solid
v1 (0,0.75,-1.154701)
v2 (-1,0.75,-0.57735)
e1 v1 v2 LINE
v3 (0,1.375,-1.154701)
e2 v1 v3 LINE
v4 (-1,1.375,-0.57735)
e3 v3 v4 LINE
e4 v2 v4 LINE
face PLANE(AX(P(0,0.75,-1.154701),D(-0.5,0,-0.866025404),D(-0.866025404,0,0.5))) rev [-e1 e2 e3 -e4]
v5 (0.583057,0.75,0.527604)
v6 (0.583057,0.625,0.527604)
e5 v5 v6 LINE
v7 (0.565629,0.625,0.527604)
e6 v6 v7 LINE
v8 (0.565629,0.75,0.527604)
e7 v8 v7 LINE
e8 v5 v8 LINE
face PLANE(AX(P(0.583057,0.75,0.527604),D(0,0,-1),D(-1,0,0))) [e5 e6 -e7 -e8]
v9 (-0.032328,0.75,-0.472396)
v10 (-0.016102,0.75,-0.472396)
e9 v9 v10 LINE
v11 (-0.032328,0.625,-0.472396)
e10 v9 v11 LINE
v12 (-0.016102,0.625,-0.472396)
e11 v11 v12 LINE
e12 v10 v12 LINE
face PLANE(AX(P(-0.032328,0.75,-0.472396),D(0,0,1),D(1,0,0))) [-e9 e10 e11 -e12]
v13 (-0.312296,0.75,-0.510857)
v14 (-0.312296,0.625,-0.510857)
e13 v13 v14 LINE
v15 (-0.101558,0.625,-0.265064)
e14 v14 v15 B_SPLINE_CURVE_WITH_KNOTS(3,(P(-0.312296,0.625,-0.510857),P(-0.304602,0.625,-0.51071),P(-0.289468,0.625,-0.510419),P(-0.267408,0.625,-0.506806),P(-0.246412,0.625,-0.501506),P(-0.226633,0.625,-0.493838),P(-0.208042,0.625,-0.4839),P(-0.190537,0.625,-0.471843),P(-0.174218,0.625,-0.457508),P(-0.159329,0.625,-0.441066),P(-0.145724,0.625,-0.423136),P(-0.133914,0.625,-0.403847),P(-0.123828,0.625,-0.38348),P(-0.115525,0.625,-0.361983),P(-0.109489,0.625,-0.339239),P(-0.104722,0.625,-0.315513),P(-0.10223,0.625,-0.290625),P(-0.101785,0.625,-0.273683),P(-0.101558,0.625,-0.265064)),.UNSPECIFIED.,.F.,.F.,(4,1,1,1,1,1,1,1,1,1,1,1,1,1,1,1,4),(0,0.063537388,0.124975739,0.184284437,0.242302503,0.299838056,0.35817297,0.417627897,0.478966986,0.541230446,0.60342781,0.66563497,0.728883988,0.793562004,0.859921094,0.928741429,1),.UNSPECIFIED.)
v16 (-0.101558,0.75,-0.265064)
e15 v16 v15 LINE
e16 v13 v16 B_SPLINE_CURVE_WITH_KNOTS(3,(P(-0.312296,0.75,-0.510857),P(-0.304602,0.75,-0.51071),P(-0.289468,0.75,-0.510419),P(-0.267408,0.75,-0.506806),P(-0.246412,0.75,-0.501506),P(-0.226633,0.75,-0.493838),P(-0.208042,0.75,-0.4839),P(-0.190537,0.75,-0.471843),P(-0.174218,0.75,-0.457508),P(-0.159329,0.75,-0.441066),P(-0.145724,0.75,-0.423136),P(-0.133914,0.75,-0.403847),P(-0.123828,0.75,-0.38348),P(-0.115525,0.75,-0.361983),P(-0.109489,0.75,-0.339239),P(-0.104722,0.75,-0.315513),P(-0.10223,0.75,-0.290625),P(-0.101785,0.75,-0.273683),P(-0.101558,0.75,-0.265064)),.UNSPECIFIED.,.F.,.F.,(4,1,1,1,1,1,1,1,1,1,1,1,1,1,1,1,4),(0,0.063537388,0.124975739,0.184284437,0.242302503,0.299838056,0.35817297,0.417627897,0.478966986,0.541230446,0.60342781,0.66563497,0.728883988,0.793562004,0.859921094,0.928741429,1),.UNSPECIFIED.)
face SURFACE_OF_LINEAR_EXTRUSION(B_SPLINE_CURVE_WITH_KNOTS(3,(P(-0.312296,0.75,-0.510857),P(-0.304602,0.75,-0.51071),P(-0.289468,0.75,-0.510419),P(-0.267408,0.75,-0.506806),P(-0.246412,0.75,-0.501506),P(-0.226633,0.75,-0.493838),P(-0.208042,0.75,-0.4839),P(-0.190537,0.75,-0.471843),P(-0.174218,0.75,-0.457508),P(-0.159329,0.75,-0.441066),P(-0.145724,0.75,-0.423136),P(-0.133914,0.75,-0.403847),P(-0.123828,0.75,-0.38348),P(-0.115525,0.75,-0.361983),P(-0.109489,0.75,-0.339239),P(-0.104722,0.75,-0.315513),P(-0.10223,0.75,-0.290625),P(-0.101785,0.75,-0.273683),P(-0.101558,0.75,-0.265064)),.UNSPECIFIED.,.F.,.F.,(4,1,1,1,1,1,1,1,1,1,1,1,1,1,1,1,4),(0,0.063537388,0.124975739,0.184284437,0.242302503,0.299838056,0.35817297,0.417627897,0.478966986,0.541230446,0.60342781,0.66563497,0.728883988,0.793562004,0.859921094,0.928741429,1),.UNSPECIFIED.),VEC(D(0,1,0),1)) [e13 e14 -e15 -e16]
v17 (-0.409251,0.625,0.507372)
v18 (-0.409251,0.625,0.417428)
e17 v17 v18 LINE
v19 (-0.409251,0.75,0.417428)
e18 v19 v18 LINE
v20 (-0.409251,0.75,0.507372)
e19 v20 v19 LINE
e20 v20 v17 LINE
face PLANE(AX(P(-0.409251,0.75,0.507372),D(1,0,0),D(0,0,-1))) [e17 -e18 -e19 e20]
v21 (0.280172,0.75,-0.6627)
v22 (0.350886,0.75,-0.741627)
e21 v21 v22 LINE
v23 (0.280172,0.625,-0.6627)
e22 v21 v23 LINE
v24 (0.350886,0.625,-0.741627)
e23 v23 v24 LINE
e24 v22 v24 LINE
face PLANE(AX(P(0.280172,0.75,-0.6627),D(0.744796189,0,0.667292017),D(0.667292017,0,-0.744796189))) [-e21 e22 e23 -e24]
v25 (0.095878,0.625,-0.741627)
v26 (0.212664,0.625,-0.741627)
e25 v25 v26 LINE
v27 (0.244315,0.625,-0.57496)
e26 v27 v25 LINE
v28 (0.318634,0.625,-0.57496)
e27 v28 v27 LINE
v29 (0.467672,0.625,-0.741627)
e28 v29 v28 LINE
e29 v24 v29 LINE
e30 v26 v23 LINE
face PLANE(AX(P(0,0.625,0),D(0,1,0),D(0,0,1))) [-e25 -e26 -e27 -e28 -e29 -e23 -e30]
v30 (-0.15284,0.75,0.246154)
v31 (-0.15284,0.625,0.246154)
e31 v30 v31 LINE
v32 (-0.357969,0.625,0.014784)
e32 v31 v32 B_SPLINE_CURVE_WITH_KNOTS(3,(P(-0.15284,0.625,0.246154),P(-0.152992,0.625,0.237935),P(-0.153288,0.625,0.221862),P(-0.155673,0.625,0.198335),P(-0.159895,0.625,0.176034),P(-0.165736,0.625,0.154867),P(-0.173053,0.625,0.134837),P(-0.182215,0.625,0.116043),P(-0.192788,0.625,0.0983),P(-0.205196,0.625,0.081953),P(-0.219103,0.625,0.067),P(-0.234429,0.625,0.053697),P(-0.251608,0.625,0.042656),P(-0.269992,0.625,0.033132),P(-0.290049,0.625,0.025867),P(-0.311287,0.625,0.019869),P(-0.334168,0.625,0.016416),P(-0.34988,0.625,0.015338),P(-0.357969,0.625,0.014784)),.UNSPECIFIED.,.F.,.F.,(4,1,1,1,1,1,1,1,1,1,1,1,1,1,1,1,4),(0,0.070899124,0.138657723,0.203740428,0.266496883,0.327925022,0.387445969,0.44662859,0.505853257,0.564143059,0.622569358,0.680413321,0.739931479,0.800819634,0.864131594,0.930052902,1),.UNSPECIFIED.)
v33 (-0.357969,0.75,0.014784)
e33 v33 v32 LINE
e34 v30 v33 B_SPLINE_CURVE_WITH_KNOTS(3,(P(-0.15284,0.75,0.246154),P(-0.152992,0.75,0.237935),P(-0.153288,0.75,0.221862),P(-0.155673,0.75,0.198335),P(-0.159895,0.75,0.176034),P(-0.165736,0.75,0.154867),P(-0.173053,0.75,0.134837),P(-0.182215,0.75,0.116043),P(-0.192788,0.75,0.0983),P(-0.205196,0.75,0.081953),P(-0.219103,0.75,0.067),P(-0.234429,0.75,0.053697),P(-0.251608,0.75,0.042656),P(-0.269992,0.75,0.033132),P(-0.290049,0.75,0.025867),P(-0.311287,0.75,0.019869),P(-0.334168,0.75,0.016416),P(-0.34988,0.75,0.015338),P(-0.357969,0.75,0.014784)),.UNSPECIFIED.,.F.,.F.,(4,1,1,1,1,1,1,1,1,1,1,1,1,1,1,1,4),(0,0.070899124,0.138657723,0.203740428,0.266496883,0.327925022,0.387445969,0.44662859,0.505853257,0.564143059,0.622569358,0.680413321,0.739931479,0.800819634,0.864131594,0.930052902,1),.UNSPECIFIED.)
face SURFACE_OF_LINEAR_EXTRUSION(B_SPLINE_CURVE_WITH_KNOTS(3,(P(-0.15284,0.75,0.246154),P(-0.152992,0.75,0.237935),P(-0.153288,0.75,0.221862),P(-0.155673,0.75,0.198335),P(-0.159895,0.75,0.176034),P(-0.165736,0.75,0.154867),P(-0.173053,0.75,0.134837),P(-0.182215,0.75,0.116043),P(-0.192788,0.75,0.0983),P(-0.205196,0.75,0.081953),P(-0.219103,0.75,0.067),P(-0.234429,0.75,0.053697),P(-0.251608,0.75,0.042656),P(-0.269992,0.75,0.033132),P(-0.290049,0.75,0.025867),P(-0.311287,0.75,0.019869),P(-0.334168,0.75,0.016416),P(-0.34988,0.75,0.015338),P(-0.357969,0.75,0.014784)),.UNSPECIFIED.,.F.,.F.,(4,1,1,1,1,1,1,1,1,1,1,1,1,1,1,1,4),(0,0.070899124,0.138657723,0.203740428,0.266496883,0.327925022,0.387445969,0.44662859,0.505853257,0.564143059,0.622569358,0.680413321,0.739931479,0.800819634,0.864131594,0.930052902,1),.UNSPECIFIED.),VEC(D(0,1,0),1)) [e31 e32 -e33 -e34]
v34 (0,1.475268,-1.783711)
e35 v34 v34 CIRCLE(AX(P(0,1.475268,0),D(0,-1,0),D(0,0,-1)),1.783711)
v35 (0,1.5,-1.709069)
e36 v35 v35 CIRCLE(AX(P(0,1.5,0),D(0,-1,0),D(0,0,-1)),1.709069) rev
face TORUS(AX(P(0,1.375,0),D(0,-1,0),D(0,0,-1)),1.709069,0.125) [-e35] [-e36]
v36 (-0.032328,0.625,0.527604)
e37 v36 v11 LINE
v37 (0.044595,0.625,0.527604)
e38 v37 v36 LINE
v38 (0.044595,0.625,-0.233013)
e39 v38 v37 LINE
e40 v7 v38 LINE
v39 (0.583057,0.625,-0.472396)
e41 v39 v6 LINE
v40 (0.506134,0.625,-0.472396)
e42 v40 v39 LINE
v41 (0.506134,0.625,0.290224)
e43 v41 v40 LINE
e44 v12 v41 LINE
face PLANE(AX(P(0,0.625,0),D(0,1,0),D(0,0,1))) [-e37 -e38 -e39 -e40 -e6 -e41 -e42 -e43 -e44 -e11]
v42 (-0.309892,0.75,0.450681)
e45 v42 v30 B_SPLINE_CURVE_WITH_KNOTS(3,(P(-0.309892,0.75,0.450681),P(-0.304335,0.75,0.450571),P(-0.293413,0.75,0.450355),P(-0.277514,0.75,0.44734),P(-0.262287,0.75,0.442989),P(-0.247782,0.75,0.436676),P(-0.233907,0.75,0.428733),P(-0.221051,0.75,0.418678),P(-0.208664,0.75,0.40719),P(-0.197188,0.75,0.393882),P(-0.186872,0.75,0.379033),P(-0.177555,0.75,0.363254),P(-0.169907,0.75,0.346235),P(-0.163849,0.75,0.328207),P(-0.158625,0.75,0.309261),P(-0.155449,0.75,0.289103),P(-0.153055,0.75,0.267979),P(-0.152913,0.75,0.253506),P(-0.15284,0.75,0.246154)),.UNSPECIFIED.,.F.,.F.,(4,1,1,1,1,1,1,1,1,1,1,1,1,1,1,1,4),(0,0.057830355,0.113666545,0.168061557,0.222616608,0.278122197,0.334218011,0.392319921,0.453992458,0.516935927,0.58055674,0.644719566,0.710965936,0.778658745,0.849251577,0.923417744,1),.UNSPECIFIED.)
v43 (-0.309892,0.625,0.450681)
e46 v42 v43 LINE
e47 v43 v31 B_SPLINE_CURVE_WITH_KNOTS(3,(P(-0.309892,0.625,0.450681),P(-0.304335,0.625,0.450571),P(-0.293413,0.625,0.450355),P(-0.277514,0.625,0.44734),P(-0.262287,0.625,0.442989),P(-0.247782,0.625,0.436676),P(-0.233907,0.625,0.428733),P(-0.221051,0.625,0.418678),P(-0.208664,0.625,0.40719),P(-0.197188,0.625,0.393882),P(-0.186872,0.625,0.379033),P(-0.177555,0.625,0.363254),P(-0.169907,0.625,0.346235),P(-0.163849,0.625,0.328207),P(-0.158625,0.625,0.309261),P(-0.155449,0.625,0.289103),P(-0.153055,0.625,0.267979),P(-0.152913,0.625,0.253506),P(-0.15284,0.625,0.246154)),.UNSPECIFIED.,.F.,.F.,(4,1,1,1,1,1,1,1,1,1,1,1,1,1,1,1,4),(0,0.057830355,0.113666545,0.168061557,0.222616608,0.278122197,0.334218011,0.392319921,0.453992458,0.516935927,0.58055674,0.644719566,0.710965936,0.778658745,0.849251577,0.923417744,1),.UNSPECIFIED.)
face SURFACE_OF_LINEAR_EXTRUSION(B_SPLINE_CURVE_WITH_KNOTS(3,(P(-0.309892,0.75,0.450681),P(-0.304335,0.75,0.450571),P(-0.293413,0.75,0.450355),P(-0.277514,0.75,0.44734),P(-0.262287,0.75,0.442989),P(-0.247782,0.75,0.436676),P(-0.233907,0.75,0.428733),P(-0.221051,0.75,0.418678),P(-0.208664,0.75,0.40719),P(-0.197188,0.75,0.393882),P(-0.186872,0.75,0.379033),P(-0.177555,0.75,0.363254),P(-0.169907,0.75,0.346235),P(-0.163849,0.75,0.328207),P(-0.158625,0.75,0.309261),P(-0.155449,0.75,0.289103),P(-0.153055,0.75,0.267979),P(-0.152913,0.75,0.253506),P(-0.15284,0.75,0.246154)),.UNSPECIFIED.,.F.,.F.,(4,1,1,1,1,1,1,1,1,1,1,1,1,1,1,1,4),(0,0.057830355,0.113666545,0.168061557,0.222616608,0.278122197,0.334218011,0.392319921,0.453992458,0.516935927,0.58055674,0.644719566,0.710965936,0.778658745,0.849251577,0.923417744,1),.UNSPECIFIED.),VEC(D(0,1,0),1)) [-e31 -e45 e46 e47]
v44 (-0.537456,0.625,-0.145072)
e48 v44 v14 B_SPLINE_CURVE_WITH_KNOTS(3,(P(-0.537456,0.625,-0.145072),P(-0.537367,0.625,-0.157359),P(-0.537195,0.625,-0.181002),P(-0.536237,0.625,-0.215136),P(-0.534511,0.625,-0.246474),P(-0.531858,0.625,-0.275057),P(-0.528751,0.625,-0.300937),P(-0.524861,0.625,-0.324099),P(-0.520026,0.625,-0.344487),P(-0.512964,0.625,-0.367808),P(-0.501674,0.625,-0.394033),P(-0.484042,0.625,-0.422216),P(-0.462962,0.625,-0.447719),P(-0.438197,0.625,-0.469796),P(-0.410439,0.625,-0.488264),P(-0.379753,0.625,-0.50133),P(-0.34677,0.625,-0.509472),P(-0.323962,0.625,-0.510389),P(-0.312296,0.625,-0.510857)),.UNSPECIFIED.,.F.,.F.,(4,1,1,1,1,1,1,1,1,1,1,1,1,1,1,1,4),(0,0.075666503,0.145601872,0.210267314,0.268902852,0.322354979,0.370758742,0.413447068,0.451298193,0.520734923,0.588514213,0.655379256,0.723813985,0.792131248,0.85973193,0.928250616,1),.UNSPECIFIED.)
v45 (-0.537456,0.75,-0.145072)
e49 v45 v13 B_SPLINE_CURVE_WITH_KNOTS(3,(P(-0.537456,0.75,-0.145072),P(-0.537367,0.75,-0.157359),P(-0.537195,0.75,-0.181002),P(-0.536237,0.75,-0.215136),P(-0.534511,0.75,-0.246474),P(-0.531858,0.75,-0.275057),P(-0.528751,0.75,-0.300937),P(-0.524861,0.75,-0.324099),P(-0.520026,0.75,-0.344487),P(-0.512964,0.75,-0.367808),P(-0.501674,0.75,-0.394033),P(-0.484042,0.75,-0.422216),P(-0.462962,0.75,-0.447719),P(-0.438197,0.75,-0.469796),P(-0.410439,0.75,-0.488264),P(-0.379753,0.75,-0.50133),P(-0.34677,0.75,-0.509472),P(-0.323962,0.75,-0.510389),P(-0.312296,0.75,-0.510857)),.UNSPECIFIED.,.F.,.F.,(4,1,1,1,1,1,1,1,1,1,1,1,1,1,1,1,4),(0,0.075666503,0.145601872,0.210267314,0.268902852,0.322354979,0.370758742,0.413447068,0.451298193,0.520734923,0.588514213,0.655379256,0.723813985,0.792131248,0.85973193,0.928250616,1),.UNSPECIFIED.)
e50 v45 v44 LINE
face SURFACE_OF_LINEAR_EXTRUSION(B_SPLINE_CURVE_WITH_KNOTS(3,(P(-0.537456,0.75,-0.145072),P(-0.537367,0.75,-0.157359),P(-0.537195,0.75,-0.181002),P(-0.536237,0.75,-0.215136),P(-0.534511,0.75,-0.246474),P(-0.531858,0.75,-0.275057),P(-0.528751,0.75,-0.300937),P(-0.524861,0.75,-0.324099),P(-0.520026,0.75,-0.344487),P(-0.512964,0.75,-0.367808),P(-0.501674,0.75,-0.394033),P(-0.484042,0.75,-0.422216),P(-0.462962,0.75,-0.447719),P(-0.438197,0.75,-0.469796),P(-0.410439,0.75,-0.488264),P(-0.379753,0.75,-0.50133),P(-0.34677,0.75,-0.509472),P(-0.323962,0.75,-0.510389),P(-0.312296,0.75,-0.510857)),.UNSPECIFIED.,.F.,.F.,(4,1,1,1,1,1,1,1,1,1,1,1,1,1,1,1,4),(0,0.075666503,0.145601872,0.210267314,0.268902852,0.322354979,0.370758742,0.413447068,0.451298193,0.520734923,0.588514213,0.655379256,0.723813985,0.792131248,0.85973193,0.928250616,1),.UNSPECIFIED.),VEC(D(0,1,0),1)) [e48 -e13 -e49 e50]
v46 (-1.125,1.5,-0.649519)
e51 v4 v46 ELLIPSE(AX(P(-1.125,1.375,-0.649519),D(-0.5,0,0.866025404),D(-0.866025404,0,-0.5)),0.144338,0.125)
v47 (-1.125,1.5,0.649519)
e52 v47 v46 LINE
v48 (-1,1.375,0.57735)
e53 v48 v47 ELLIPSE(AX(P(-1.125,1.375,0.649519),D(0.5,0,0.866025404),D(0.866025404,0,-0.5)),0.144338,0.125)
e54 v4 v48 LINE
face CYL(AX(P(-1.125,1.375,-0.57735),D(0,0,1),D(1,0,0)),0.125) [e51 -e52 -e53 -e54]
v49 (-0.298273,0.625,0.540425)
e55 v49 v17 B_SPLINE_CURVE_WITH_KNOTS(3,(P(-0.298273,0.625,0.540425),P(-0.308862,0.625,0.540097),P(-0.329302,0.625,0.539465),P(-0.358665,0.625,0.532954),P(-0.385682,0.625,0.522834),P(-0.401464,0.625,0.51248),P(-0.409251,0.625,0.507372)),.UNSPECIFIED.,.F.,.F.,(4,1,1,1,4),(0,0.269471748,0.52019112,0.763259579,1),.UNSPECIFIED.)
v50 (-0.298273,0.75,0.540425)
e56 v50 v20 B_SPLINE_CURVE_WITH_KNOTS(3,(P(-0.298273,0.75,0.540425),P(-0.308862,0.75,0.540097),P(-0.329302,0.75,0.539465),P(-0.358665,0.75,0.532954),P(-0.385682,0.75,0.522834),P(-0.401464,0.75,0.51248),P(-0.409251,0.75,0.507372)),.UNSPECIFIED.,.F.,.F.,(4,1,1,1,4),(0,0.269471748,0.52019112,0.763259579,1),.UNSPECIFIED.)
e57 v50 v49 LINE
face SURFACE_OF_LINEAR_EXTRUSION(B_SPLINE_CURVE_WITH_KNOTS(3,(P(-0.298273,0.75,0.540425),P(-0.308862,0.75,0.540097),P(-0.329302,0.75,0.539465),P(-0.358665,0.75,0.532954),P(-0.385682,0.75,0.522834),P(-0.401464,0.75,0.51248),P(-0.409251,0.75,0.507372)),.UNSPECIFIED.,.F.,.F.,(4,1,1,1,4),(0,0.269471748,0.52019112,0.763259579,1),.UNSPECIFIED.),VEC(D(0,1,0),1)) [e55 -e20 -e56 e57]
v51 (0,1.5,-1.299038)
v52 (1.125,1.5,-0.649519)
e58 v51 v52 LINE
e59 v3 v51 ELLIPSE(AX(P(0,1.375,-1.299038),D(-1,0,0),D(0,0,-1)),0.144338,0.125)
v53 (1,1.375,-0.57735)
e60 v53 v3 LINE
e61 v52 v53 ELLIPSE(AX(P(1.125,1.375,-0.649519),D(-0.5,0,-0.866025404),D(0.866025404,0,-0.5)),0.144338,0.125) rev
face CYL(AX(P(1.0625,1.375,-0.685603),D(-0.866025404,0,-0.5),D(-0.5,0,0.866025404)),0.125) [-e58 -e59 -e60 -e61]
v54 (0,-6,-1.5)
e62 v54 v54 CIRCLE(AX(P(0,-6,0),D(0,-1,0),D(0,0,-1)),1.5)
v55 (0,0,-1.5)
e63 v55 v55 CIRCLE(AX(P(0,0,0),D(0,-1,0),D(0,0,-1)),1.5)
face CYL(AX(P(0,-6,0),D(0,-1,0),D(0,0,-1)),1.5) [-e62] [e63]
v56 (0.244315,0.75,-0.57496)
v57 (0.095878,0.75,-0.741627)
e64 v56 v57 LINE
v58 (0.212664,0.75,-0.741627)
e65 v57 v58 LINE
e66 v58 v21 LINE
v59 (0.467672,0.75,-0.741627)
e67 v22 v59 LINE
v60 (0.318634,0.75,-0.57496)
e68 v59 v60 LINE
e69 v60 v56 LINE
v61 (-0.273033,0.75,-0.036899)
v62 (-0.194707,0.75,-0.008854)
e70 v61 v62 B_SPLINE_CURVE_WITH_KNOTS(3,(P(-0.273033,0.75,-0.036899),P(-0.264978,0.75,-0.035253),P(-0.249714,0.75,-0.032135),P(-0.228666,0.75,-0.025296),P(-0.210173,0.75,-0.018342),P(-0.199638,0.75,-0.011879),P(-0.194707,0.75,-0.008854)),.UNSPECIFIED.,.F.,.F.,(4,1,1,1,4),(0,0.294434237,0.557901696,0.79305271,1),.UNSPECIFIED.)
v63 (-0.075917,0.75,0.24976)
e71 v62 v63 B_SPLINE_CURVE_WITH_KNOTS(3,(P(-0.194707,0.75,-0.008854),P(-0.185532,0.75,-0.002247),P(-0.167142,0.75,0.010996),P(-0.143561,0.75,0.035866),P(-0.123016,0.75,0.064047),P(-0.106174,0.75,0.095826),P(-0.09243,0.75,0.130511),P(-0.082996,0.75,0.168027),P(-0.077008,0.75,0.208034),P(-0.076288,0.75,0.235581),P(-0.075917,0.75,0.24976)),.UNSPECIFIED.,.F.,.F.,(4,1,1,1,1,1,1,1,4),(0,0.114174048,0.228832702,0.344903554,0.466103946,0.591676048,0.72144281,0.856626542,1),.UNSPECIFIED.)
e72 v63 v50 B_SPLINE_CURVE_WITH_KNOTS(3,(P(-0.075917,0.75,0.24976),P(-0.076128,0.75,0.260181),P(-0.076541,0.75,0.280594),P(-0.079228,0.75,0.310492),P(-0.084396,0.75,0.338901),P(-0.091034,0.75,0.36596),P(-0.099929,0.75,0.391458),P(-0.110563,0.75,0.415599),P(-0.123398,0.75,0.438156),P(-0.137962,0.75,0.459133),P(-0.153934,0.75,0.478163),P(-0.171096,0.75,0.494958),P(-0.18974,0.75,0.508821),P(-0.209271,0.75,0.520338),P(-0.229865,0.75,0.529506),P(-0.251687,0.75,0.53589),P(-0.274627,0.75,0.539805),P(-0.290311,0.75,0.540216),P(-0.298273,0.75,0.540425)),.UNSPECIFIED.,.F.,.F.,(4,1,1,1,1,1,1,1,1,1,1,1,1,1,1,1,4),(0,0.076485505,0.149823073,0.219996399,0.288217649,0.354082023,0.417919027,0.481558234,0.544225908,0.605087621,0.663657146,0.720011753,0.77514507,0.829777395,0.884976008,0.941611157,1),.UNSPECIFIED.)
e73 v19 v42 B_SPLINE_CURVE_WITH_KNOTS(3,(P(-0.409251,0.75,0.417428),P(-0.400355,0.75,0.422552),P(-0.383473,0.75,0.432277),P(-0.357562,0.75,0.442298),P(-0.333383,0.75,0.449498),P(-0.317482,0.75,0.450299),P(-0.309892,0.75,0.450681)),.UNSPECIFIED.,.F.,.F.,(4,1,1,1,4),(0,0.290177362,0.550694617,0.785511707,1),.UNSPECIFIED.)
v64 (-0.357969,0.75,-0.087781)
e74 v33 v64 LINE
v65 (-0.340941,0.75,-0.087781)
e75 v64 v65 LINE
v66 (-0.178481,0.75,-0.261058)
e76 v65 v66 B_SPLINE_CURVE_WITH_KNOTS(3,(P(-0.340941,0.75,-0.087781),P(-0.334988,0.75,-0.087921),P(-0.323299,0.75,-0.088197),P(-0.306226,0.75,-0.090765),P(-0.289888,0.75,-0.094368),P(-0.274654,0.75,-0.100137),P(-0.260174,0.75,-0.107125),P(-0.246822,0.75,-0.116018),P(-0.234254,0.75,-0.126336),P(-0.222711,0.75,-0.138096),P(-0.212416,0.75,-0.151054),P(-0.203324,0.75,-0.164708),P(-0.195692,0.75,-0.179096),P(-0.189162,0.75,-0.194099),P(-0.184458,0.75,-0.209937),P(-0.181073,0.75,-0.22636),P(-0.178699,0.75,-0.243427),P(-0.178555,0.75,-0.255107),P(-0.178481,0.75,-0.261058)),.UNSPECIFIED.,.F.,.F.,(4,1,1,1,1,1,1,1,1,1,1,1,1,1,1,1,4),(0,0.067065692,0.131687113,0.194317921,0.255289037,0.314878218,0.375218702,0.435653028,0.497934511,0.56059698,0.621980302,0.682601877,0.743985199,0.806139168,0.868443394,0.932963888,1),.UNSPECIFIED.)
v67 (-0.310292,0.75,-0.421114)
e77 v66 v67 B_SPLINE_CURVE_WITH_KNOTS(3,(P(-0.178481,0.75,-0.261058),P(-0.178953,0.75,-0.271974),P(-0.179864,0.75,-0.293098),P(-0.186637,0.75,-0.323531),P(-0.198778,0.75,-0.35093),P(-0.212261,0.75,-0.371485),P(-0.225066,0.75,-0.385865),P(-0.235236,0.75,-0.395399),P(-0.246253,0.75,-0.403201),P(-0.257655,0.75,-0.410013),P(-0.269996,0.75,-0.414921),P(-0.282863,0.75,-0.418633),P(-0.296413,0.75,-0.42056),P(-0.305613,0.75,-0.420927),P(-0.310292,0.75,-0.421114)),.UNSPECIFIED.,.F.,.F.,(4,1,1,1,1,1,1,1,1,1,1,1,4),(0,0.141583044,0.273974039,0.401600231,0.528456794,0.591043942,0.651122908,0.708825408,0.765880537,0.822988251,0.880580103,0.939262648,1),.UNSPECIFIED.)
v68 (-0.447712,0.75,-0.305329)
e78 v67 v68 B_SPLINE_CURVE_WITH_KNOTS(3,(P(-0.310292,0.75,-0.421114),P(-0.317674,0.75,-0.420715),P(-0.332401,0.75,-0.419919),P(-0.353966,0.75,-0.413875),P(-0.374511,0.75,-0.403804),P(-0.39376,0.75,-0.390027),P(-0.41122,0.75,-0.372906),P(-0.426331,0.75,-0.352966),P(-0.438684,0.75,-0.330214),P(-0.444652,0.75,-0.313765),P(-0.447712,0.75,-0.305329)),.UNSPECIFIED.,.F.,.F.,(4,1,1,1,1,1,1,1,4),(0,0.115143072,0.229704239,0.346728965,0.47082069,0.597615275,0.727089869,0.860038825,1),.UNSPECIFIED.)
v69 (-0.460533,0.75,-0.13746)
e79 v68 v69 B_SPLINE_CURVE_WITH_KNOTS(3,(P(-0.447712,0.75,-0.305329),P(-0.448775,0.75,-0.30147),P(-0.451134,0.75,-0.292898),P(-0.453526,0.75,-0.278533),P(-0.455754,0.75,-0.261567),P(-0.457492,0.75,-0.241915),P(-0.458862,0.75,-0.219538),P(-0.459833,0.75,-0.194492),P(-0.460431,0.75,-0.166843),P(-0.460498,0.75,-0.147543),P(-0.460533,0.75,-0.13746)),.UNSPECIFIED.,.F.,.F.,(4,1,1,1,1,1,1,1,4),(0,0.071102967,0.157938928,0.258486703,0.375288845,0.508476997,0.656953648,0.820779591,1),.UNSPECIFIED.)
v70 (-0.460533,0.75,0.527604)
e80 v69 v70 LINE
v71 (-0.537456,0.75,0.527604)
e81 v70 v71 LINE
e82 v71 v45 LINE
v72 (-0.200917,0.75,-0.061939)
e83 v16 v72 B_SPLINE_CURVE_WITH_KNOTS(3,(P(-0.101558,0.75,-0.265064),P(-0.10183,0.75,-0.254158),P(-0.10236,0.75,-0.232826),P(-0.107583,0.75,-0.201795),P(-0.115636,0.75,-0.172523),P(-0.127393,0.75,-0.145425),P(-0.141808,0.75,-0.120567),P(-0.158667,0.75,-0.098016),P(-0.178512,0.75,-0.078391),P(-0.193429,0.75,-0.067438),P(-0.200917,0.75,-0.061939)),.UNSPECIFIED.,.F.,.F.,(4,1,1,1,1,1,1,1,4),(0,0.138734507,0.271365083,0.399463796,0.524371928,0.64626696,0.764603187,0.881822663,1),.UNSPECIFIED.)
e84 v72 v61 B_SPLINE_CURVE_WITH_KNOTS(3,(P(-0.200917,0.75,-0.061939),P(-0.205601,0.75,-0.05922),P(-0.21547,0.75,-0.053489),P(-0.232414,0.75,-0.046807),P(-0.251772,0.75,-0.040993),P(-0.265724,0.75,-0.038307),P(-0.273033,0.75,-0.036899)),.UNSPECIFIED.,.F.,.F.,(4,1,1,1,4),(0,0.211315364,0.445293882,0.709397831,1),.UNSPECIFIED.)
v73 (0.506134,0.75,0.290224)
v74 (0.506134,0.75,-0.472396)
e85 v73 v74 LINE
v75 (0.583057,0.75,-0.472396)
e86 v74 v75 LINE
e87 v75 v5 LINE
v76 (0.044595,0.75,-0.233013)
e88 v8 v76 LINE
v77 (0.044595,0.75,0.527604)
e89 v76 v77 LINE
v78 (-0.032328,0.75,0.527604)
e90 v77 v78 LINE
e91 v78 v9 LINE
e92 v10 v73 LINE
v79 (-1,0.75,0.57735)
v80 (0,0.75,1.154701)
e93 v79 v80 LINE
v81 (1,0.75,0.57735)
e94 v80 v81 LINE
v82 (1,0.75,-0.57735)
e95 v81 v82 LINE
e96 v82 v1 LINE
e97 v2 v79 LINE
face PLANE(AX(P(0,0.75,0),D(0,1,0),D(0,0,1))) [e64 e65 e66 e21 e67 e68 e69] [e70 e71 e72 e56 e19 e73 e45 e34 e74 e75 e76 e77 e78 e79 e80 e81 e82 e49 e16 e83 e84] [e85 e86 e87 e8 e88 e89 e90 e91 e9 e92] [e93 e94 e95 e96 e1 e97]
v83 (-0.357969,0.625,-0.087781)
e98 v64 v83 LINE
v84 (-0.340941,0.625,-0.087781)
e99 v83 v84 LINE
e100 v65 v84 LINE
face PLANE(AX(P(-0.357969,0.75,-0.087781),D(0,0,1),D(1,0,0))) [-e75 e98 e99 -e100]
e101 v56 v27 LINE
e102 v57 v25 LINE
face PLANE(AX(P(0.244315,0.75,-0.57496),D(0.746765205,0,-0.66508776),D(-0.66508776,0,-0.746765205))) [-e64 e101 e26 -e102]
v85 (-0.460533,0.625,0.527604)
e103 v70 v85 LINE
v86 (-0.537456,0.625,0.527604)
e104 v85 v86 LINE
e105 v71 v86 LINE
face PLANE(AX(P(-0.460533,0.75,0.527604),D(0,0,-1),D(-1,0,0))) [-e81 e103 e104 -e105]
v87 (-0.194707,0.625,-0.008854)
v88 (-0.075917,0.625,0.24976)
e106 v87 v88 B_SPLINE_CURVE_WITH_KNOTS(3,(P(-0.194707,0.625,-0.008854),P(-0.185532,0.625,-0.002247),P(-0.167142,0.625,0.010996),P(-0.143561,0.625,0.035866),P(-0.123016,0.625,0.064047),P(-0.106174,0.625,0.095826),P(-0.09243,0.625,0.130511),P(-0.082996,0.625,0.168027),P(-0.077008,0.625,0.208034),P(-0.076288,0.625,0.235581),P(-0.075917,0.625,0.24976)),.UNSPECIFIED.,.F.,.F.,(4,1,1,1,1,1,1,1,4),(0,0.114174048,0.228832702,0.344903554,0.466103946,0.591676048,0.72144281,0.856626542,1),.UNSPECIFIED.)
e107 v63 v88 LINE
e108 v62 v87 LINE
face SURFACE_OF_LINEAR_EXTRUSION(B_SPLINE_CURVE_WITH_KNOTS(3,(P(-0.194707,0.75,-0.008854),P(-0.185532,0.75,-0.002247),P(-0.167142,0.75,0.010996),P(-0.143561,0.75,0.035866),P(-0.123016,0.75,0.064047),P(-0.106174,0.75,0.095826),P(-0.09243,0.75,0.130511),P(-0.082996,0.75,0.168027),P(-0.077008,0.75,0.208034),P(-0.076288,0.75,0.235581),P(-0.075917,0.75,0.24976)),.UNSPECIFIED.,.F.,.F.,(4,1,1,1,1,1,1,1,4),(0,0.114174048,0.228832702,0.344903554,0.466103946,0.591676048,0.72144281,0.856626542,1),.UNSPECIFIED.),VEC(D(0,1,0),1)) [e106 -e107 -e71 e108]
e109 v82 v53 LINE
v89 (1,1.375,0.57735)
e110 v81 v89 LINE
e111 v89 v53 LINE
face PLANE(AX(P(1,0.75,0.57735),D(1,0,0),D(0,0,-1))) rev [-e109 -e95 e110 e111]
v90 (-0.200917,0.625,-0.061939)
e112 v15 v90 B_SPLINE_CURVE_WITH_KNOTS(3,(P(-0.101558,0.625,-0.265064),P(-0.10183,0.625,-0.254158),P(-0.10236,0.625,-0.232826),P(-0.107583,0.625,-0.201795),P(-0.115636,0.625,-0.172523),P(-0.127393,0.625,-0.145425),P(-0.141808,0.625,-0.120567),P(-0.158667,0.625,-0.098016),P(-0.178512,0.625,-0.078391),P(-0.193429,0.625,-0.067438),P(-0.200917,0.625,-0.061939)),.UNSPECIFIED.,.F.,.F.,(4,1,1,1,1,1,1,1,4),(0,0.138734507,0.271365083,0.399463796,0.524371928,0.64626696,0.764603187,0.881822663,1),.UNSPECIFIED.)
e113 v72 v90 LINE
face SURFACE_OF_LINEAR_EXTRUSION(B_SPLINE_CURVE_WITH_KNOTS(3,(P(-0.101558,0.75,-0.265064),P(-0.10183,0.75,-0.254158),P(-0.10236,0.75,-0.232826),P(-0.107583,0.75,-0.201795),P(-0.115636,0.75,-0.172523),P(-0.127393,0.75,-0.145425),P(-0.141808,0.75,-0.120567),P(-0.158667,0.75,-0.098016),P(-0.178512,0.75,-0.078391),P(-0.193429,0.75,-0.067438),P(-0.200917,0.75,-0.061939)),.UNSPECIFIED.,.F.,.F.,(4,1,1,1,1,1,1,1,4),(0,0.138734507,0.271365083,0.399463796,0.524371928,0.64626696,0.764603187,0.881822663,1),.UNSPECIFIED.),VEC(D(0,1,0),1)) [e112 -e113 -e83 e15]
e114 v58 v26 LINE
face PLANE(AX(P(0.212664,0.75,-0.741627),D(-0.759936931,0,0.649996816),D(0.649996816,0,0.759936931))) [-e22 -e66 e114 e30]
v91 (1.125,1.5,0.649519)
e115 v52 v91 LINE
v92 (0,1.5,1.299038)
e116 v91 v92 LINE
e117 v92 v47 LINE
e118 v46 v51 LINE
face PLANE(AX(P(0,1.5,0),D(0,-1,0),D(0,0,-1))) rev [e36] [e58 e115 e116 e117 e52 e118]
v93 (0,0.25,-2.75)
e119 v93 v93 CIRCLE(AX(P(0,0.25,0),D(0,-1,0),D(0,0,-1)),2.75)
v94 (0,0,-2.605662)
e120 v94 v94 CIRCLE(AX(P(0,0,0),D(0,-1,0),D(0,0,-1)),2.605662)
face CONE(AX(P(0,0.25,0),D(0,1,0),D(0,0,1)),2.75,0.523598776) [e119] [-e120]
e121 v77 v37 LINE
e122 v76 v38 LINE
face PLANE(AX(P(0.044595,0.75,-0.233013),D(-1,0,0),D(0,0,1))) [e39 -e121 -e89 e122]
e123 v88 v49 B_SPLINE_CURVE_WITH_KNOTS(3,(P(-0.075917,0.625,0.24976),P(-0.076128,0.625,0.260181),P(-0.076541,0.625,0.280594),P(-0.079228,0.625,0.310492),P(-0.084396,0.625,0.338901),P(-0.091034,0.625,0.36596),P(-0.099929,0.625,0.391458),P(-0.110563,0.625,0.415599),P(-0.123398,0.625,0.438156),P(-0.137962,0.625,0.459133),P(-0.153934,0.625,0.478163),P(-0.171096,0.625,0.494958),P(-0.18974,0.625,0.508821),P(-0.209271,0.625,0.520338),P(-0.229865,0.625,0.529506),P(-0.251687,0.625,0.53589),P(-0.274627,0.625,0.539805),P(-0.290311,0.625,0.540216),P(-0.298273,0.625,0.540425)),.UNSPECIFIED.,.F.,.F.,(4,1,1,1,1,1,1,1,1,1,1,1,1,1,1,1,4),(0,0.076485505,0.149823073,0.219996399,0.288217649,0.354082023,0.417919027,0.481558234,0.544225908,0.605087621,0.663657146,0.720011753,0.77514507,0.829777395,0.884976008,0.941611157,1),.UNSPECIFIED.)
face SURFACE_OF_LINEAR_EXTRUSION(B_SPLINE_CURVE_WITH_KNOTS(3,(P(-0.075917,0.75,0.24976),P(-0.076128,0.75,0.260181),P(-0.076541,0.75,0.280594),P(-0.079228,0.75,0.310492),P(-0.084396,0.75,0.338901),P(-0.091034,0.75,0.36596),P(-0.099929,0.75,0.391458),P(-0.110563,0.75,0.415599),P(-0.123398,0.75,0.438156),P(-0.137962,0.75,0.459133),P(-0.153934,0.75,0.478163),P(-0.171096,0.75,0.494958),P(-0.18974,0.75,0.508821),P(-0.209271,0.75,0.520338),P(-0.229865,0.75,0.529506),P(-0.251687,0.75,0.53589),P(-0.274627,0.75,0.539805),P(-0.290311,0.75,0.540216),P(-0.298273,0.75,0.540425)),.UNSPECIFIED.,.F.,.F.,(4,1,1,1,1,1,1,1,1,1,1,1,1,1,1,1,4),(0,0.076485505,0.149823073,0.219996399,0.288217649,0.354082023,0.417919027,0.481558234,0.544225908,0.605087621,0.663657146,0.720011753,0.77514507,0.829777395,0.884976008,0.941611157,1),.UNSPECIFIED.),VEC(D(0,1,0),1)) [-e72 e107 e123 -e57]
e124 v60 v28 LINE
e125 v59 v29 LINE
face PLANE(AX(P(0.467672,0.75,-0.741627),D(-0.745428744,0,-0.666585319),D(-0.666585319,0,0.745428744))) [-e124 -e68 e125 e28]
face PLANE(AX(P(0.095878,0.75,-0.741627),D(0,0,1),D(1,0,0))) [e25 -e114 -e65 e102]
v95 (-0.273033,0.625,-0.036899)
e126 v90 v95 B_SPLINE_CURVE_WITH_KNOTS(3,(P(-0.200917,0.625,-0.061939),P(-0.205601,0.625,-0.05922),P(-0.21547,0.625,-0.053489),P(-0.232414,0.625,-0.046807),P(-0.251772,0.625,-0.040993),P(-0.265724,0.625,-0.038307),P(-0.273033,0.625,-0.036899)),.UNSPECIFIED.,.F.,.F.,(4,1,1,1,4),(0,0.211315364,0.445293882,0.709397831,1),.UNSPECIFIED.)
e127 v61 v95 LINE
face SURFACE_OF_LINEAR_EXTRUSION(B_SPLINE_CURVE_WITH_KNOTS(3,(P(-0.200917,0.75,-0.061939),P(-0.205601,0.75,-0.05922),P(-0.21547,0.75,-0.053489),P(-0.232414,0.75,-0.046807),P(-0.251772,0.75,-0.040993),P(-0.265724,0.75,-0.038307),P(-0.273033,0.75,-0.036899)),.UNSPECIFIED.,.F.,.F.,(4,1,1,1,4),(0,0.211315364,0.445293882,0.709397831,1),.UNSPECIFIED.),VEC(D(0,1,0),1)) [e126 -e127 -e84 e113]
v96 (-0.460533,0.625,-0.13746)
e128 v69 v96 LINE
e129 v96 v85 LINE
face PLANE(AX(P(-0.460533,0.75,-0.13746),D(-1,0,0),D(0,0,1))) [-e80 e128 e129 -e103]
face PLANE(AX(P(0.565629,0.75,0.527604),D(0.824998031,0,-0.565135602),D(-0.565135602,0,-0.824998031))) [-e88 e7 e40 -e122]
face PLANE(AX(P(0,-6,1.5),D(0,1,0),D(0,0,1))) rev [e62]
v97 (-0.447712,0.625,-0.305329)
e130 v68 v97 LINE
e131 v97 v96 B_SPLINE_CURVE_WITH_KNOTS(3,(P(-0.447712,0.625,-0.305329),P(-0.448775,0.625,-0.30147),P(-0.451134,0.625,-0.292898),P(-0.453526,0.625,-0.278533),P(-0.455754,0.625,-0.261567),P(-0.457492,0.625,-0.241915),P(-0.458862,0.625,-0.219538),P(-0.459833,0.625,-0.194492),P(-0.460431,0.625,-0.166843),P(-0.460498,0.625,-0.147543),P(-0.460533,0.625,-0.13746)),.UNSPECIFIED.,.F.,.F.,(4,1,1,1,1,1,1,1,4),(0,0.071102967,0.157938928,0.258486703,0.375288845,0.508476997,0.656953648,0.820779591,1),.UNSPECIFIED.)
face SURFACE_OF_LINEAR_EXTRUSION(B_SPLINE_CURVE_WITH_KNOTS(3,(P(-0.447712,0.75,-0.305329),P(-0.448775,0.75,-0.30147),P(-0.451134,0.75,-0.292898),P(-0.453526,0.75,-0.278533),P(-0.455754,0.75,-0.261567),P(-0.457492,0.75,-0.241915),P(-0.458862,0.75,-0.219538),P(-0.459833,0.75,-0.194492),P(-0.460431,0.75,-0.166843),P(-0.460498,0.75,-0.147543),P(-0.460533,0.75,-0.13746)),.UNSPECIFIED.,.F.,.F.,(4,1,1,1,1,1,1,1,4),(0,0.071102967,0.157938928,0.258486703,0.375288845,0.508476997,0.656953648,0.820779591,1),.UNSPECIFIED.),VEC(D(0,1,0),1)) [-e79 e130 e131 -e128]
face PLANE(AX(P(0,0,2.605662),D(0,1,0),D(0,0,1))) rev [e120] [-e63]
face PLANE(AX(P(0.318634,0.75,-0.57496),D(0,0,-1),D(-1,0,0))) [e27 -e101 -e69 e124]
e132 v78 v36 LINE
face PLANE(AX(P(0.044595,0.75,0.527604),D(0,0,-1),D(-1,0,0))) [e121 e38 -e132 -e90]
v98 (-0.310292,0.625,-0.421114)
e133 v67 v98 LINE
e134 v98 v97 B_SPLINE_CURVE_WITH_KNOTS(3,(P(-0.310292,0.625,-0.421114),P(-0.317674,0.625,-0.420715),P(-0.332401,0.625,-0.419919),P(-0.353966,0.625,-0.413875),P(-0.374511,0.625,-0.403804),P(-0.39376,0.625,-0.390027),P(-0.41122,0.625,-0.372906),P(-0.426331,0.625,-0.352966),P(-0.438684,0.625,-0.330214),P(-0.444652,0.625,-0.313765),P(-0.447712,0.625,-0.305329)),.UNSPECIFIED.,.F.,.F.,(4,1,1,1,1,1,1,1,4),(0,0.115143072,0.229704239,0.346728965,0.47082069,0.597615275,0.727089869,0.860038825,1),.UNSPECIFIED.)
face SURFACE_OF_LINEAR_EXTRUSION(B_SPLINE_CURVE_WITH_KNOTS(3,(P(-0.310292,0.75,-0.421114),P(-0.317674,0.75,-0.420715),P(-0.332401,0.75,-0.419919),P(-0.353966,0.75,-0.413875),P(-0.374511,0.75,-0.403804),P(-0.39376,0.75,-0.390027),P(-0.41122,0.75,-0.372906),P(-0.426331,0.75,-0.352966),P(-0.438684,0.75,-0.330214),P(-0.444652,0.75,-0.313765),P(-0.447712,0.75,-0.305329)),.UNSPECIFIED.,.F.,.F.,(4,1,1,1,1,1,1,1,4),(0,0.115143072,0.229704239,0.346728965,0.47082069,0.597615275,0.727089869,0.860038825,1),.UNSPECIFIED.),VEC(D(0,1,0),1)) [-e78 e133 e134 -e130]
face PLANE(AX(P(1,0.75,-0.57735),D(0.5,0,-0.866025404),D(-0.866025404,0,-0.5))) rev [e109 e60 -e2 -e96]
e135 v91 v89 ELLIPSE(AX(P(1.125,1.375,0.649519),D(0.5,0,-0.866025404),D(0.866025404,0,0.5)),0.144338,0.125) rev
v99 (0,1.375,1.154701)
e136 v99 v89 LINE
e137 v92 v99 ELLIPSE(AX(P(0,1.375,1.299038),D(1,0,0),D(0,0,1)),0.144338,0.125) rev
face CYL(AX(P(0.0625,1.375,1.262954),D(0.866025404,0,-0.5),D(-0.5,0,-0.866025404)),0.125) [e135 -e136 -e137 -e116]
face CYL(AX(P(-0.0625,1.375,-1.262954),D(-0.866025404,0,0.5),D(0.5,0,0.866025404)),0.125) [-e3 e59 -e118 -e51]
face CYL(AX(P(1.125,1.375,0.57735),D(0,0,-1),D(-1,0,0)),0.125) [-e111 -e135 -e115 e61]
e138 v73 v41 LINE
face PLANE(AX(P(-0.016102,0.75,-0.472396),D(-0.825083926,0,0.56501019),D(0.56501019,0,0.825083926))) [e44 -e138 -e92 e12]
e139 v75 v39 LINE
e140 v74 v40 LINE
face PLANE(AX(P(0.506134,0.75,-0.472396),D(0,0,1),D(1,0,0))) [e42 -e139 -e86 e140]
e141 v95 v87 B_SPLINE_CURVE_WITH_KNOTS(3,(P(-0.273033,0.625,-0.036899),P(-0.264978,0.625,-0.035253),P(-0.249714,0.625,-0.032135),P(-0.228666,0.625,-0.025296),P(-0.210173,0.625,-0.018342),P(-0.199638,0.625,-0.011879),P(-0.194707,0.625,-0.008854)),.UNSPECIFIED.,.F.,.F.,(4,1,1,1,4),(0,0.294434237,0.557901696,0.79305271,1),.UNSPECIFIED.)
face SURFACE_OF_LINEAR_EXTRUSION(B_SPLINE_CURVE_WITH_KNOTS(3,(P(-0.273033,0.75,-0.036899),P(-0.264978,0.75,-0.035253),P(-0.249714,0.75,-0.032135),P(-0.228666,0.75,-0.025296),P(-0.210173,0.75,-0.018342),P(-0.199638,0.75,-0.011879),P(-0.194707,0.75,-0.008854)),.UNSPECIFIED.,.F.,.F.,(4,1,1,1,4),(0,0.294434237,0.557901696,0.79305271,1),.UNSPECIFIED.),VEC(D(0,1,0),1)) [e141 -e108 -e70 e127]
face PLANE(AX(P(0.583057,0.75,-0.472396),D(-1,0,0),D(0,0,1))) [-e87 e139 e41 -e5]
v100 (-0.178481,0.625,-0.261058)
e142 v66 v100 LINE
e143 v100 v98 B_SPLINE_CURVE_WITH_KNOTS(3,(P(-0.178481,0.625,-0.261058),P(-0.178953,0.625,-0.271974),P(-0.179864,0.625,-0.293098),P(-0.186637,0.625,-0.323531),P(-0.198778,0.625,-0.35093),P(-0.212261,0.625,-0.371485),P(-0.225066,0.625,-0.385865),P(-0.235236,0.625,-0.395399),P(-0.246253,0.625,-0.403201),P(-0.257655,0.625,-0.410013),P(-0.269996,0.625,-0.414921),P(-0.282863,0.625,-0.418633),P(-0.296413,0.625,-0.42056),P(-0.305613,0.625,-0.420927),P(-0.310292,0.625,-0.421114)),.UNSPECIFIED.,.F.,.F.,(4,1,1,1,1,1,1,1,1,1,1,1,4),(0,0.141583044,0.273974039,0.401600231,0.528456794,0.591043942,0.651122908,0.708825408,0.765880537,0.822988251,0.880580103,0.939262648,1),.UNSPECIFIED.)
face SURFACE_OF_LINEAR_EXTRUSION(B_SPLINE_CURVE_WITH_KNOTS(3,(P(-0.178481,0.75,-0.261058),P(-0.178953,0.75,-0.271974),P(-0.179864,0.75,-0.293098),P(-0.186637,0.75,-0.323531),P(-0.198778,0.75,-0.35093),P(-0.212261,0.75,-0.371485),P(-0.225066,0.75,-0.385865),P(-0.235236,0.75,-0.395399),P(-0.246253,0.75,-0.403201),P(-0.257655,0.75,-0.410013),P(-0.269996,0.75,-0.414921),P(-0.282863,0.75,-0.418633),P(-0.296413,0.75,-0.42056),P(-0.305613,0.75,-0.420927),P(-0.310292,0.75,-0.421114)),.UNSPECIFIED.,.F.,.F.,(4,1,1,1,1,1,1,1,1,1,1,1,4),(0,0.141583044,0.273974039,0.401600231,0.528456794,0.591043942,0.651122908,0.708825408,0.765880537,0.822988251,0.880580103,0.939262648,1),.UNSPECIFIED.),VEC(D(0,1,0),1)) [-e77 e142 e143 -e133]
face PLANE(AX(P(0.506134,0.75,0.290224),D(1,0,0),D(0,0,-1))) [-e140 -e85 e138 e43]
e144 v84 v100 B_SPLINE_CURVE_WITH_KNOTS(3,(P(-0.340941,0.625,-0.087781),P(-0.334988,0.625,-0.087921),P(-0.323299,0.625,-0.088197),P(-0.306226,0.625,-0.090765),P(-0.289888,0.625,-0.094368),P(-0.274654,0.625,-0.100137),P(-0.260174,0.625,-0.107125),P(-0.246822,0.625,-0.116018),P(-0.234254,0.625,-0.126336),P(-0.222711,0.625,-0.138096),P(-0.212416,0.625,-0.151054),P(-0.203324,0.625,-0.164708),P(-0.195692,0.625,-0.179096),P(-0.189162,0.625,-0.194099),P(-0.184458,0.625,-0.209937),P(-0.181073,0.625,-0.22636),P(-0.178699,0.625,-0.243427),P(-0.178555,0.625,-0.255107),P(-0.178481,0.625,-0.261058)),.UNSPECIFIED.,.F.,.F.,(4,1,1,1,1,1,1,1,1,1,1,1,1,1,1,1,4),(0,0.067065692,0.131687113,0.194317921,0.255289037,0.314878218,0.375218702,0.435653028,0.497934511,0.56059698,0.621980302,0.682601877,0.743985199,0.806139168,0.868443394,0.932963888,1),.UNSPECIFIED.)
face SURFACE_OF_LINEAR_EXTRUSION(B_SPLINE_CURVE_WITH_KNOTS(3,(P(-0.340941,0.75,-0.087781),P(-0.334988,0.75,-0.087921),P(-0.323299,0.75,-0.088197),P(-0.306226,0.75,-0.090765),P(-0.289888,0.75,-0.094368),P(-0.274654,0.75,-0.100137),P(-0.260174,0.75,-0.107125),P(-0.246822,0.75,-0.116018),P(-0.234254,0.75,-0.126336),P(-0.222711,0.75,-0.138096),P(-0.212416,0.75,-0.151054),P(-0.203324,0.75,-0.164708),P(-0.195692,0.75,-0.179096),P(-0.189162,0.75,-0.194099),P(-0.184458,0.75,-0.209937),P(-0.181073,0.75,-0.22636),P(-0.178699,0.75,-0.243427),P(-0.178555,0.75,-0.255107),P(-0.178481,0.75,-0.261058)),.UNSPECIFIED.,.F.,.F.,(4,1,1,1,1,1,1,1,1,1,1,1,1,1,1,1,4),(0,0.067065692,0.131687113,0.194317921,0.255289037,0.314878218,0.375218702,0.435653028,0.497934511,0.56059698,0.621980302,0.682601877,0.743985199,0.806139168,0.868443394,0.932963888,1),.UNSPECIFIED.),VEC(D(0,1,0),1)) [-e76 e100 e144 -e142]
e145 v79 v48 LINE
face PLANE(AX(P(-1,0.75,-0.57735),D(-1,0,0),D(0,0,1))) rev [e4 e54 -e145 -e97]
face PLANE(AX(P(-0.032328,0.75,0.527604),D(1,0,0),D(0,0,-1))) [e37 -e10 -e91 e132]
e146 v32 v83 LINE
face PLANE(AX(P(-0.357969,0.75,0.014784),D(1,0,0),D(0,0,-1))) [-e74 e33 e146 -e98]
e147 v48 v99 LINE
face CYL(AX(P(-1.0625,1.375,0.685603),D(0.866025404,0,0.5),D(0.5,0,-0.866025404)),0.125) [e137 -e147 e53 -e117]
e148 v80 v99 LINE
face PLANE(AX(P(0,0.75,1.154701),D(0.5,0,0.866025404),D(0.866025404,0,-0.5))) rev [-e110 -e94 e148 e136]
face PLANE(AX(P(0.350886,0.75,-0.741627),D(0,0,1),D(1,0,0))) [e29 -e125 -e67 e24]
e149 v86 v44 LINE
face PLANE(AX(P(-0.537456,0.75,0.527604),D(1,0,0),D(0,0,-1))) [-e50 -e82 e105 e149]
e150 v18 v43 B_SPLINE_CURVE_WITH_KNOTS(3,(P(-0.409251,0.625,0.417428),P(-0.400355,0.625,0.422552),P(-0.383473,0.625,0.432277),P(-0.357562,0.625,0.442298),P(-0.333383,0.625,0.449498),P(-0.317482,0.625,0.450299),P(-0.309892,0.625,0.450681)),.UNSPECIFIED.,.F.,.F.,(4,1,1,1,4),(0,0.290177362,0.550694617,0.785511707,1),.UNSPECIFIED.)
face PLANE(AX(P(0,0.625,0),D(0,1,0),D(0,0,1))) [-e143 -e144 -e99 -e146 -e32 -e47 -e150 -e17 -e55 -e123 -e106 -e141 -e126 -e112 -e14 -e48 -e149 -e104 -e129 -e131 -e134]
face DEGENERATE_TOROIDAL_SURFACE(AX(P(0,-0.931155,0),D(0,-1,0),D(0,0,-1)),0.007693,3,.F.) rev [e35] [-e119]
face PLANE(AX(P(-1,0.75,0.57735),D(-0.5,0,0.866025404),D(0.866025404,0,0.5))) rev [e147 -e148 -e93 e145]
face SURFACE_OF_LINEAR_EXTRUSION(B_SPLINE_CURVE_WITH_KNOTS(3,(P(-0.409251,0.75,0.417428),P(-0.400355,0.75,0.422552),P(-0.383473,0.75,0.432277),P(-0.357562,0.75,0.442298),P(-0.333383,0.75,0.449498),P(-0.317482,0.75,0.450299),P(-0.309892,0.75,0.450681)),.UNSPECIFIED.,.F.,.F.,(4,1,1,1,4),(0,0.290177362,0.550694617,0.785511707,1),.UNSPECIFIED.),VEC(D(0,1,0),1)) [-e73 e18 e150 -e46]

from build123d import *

# Parameters (mm, degrees)
CUT_EXTRUDE1_DEPTH = 0.75
FILLET1_R          = 0.125
WRAP1_START        = -0.125
WRAP1_DEPTH        = 0.125


# Read off the part's stored shape, not the designer's step: Wrap1
with BuildPart() as part:
    # Sketch1 → Revolve1 (revolve)
    with BuildSketch(Plane(origin=(0, 0, 0), x_dir=(0, 0, -1), z_dir=(1, 0, 0)), mode=Mode.PRIVATE) as revolve1_sk:
        with BuildLine():
            Line((0, 1.5), (-1.75, 1.5))
            ThreePointArc((-1.75, 1.5), (-2.334912942, 0.942930354), (-2.75, 0.25))
            Line((-2.75, 0.25), (-2.605662433, 0))
            Line((-2.605662433, 0), (-1.5, 0))
            Line((-1.5, 0), (-1.5, -6))
            Line((-1.5, -6), (0, -6))
            Line((0, -6), (0, 1.5))
        make_face()
    revolve(revolve1_sk.sketch.rotate(Axis((0, -6, 0), (0, 1, 0)), 180), axis=Axis((0, -6, 0), (0, 1, 0)))

    # Sketch2 → Cut-Extrude1 (cut)
    with BuildSketch(Plane(origin=(0, 1.5, 0), x_dir=(1, 0, 0), z_dir=(0, 1, 0))):
        Polygon((0, 1.154700538), (-1, 0.577350269), (-1, -0.577350269), (0, -1.154700538), (1, -0.577350269), (1, 0.577350269), align=None)
    extrude(amount=-CUT_EXTRUDE1_DEPTH, mode=Mode.SUBTRACT)

    # Fillet1
    fillet1_edges = [part.edges().sort_by_distance(p)[0] for p in [
        (0.5, 1.5, -0.866025404),
        (-0.5, 1.5, -0.866025404),
        (-1, 1.5, 0),
        (-0.5, 1.5, 0.866025404),
        (0.5, 1.5, 0.866025404),
        (1, 1.5, 0),
        (0, 1.5, 1.75),
    ]]
    fillet(fillet1_edges, radius=FILLET1_R)

    # Wrap1 outline → Wrap1 (cut)
    with BuildSketch(Plane(origin=(0, 0.75, 0), x_dir=(1, 0, 0), z_dir=(0, 1, 0)).offset(WRAP1_START)):
        with BuildLine():
            add(Edge.make_bspline(
                [(-0.537455829, 0.145072229), (-0.537366548, 0.15735919), (-0.537194747, 0.181002472), (-0.536236546, 0.215136123), (-0.534510696, 0.246473554), (-0.531857696, 0.275057496), (-0.528751002, 0.300937263), (-0.524861231, 0.324098842), (-0.520025531, 0.344486675), (-0.512963856, 0.367808475), (-0.501673714, 0.39403328), (-0.484042302, 0.422215735), (-0.462961845, 0.447719467), (-0.43819726, 0.469796385), (-0.410438674, 0.48826361), (-0.379753396, 0.501330341), (-0.346770262, 0.509472114), (-0.323962243, 0.510388658), (-0.312295573, 0.510857485)],
                knots=[0, 0, 0, 0, 0.075666503, 0.145601872, 0.210267314, 0.268902852, 0.322354979, 0.370758742, 0.413447068, 0.451298193, 0.520734923, 0.588514213, 0.655379256, 0.723813985, 0.792131248, 0.85973193, 0.928250616, 1, 1, 1, 1], degree=3))
            Line((-0.537455829, 0.145072229), (-0.537455829, -0.527604053))
            Line((-0.537455829, -0.527604053), (-0.460532752, -0.527604053))
            Line((-0.460532752, -0.527604053), (-0.460532752, 0.137460049))
            add(Edge.make_bspline(
                [(-0.447712239, 0.305328639), (-0.448774545, 0.301469619), (-0.451134212, 0.292897693), (-0.453525545, 0.278533298), (-0.455753975, 0.261566558), (-0.457491806, 0.241915402), (-0.458861613, 0.219538201), (-0.459832928, 0.194491685), (-0.460431178, 0.166843342), (-0.460497896, 0.147543183), (-0.460532752, 0.137460049)],
                knots=[0, 0, 0, 0, 0.071102967, 0.157938928, 0.258486703, 0.375288845, 0.508476997, 0.656953648, 0.820779591, 1, 1, 1, 1], degree=3))
            add(Edge.make_bspline(
                [(-0.310292367, 0.421113895), (-0.317674297, 0.420714803), (-0.332400851, 0.419918636), (-0.353965955, 0.413875353), (-0.374511474, 0.403804365), (-0.393760239, 0.390026559), (-0.411220155, 0.372905819), (-0.426330799, 0.352966004), (-0.438683838, 0.330213781), (-0.444651659, 0.313764569), (-0.447712239, 0.305328639)],
                knots=[0, 0, 0, 0, 0.115143072, 0.229704239, 0.346728965, 0.47082069, 0.597615275, 0.727089869, 0.860038825, 1, 1, 1, 1], degree=3))
            add(Edge.make_bspline(
                [(-0.17848147, 0.261057806), (-0.178952566, 0.271974178), (-0.179864172, 0.293098195), (-0.186637459, 0.323530756), (-0.198777604, 0.350930356), (-0.212261145, 0.371485038), (-0.225066026, 0.38586534), (-0.235235588, 0.395399384), (-0.246252738, 0.403200746), (-0.257654824, 0.410013084), (-0.269995595, 0.414921405), (-0.282862679, 0.418632696), (-0.296413152, 0.420560449), (-0.305613195, 0.420927309), (-0.310292367, 0.421113895)],
                knots=[0, 0, 0, 0, 0.141583044, 0.273974039, 0.401600231, 0.528456794, 0.591043942, 0.651122908, 0.708825408, 0.765880537, 0.822988251, 0.880580103, 0.939262648, 1, 1, 1, 1], degree=3))
            add(Edge.make_bspline(
                [(-0.340941406, 0.087780562), (-0.334988303, 0.08792105), (-0.323299062, 0.088196907), (-0.306225523, 0.090764835), (-0.289888322, 0.094368098), (-0.274654087, 0.100137271), (-0.260174408, 0.107124777), (-0.24682212, 0.11601785), (-0.234254323, 0.126336142), (-0.222711003, 0.138095802), (-0.212416341, 0.151054166), (-0.203323514, 0.164708223), (-0.195692258, 0.179095557), (-0.189162431, 0.194099224), (-0.184457799, 0.209936522), (-0.181072867, 0.226359939), (-0.178698712, 0.243427453), (-0.178554801, 0.255106579), (-0.17848147, 0.261057806)],
                knots=[0, 0, 0, 0, 0.067065692, 0.131687113, 0.194317921, 0.255289037, 0.314878218, 0.375218702, 0.435653028, 0.497934511, 0.56059698, 0.621980302, 0.682601877, 0.743985199, 0.806139168, 0.868443394, 0.932963888, 1, 1, 1, 1], degree=3))
            Line((-0.340941406, 0.087780562), (-0.357968649, 0.087780562))
            Line((-0.357968649, 0.087780562), (-0.357968649, -0.014783541))
            add(Edge.make_bspline(
                [(-0.152840444, -0.246153733), (-0.152991921, -0.237935238), (-0.153288163, -0.221862292), (-0.155672785, -0.198335348), (-0.159894598, -0.176034257), (-0.165736265, -0.154867378), (-0.173053307, -0.13483662), (-0.182215246, -0.116043494), (-0.192787882, -0.098300128), (-0.20519576, -0.081953022), (-0.21910276, -0.067000398), (-0.234429011, -0.053697294), (-0.25160782, -0.04265632), (-0.269991613, -0.033131715), (-0.29004854, -0.025867397), (-0.311286964, -0.019869429), (-0.334167811, -0.016416131), (-0.349879854, -0.015338382), (-0.357968649, -0.014783541)],
                knots=[0, 0, 0, 0, 0.070899124, 0.138657723, 0.203740428, 0.266496883, 0.327925022, 0.387445969, 0.44662859, 0.505853257, 0.564143059, 0.622569358, 0.680413321, 0.739931479, 0.800819634, 0.864131594, 0.930052902, 1, 1, 1, 1], degree=3))
            add(Edge.make_bspline(
                [(-0.309891726, -0.450680977), (-0.304334961, -0.450571211), (-0.293413044, -0.450355466), (-0.277514036, -0.447340483), (-0.262286727, -0.442989313), (-0.247781817, -0.436676481), (-0.233907442, -0.428733085), (-0.221051475, -0.418678171), (-0.208664071, -0.407189838), (-0.197187775, -0.393882067), (-0.186871623, -0.37903336), (-0.17755536, -0.363253667), (-0.169907305, -0.346235338), (-0.163848892, -0.328206631), (-0.158625475, -0.30926113), (-0.155449196, -0.289102842), (-0.15305503, -0.26797937), (-0.152912733, -0.253506267), (-0.152840444, -0.246153733)],
                knots=[0, 0, 0, 0, 0.057830355, 0.113666545, 0.168061557, 0.222616608, 0.278122197, 0.334218011, 0.392319921, 0.453992458, 0.516935927, 0.58055674, 0.644719566, 0.710965936, 0.778658745, 0.849251577, 0.923417744, 1, 1, 1, 1], degree=3))
            add(Edge.make_bspline(
                [(-0.409250701, -0.417427771), (-0.40035509, -0.422552084), (-0.383473121, -0.432276934), (-0.357561529, -0.44229785), (-0.333383308, -0.449497533), (-0.317482442, -0.450298576), (-0.309891726, -0.450680977)],
                knots=[0, 0, 0, 0, 0.290177362, 0.550694617, 0.785511707, 1, 1, 1, 1], degree=3))
            Line((-0.409250701, -0.417427771), (-0.409250701, -0.507371682))
            add(Edge.make_bspline(
                [(-0.298273137, -0.540424566), (-0.308861639, -0.540097242), (-0.329301798, -0.539465371), (-0.358664913, -0.532954409), (-0.385682425, -0.522833546), (-0.401463988, -0.512480121), (-0.409250701, -0.507371682)],
                knots=[0, 0, 0, 0, 0.269471748, 0.52019112, 0.763259579, 1, 1, 1, 1], degree=3))
            add(Edge.make_bspline(
                [(-0.075917367, -0.249759502), (-0.076128163, -0.26018073), (-0.076541077, -0.280594276), (-0.079227651, -0.310491914), (-0.084396107, -0.33890103), (-0.091033777, -0.365960134), (-0.09992887, -0.391457717), (-0.110563094, -0.41559927), (-0.123397597, -0.438155636), (-0.137962217, -0.459132621), (-0.153934421, -0.478163377), (-0.171095941, -0.494958486), (-0.189740067, -0.508821331), (-0.209271063, -0.520337979), (-0.2298646, -0.529505832), (-0.251686582, -0.535889962), (-0.274626983, -0.539804561), (-0.290311376, -0.540215808), (-0.298273137, -0.540424566)],
                knots=[0, 0, 0, 0, 0.076485505, 0.149823073, 0.219996399, 0.288217649, 0.354082023, 0.417919027, 0.481558234, 0.544225908, 0.605087621, 0.663657146, 0.720011753, 0.77514507, 0.829777395, 0.884976008, 0.941611157, 1, 1, 1, 1], degree=3))
            add(Edge.make_bspline(
                [(-0.194707432, 0.00885428), (-0.185532098, 0.002246917), (-0.167142487, -0.010995852), (-0.14356067, -0.035865532), (-0.123015599, -0.064046821), (-0.106173919, -0.095826321), (-0.092429948, -0.130510752), (-0.082995533, -0.168026939), (-0.077008082, -0.208034101), (-0.076287996, -0.23558107), (-0.075917367, -0.249759502)],
                knots=[0, 0, 0, 0, 0.114174048, 0.228832702, 0.344903554, 0.466103946, 0.591676048, 0.72144281, 0.856626542, 1, 1, 1, 1], degree=3))
            add(Edge.make_bspline(
                [(-0.273032752, 0.036899152), (-0.264977593, 0.035253476), (-0.249714467, 0.032135208), (-0.228666305, 0.025295577), (-0.210172583, 0.018341569), (-0.199638474, 0.011879289), (-0.194707432, 0.00885428)],
                knots=[0, 0, 0, 0, 0.294434237, 0.557901696, 0.79305271, 1, 1, 1, 1], degree=3))
            add(Edge.make_bspline(
                [(-0.200917367, 0.061939216), (-0.205600715, 0.059219735), (-0.215469689, 0.053489114), (-0.232413767, 0.046806913), (-0.251771921, 0.040993346), (-0.265723651, 0.038306664), (-0.273032752, 0.036899152)],
                knots=[0, 0, 0, 0, 0.211315364, 0.445293882, 0.709397831, 1, 1, 1, 1], degree=3))
            add(Edge.make_bspline(
                [(-0.101558393, 0.265064216), (-0.101829728, 0.254158186), (-0.102360461, 0.23282596), (-0.107582885, 0.201794643), (-0.115635878, 0.172523389), (-0.127393107, 0.145424978), (-0.141807851, 0.120566799), (-0.158666737, 0.09801557), (-0.178511599, 0.078390972), (-0.193428545, 0.067437991), (-0.200917367, 0.061939216)],
                knots=[0, 0, 0, 0, 0.138734507, 0.271365083, 0.399463796, 0.524371928, 0.64626696, 0.764603187, 0.881822663, 1, 1, 1, 1], degree=3))
            add(Edge.make_bspline(
                [(-0.312295573, 0.510857485), (-0.304601721, 0.510709635), (-0.289468193, 0.510418818), (-0.267407867, 0.506806308), (-0.246411552, 0.501505665), (-0.226632783, 0.49383833), (-0.208041676, 0.483900131), (-0.190537128, 0.47184286), (-0.174217748, 0.457507541), (-0.159329374, 0.44106616), (-0.145724285, 0.423136003), (-0.133914037, 0.403846519), (-0.123827558, 0.383480477), (-0.115525112, 0.361982783), (-0.109489008, 0.339238969), (-0.104721569, 0.315513437), (-0.102229905, 0.290624502), (-0.101784813, 0.273682609), (-0.101558393, 0.265064216)],
                knots=[0, 0, 0, 0, 0.063537388, 0.124975739, 0.184284437, 0.242302503, 0.299838056, 0.35817297, 0.417627897, 0.478966986, 0.541230446, 0.60342781, 0.66563497, 0.728883988, 0.793562004, 0.859921094, 0.928741429, 1, 1, 1, 1], degree=3))
        make_face()
        Polygon((0.565629107, -0.527604053), (0.583056992, -0.527604053), (0.583056992, 0.472395947), (0.506133915, 0.472395947), (0.506133915, -0.290224246), (-0.016101662, 0.472395947), (-0.032327624, 0.472395947), (-0.032327624, -0.527604053), (0.044595453, -0.527604053), (0.044595453, 0.233012934), align=None)
        Polygon((0.095877504, 0.741626716), (0.244315004, 0.574960049), (0.318633915, 0.574960049), (0.467672376, 0.741626716), (0.350885517, 0.741626716), (0.280172376, 0.662700434), (0.212664363, 0.741626716), align=None)
    extrude(amount=WRAP1_DEPTH, mode=Mode.SUBTRACT)


solid = part.part
